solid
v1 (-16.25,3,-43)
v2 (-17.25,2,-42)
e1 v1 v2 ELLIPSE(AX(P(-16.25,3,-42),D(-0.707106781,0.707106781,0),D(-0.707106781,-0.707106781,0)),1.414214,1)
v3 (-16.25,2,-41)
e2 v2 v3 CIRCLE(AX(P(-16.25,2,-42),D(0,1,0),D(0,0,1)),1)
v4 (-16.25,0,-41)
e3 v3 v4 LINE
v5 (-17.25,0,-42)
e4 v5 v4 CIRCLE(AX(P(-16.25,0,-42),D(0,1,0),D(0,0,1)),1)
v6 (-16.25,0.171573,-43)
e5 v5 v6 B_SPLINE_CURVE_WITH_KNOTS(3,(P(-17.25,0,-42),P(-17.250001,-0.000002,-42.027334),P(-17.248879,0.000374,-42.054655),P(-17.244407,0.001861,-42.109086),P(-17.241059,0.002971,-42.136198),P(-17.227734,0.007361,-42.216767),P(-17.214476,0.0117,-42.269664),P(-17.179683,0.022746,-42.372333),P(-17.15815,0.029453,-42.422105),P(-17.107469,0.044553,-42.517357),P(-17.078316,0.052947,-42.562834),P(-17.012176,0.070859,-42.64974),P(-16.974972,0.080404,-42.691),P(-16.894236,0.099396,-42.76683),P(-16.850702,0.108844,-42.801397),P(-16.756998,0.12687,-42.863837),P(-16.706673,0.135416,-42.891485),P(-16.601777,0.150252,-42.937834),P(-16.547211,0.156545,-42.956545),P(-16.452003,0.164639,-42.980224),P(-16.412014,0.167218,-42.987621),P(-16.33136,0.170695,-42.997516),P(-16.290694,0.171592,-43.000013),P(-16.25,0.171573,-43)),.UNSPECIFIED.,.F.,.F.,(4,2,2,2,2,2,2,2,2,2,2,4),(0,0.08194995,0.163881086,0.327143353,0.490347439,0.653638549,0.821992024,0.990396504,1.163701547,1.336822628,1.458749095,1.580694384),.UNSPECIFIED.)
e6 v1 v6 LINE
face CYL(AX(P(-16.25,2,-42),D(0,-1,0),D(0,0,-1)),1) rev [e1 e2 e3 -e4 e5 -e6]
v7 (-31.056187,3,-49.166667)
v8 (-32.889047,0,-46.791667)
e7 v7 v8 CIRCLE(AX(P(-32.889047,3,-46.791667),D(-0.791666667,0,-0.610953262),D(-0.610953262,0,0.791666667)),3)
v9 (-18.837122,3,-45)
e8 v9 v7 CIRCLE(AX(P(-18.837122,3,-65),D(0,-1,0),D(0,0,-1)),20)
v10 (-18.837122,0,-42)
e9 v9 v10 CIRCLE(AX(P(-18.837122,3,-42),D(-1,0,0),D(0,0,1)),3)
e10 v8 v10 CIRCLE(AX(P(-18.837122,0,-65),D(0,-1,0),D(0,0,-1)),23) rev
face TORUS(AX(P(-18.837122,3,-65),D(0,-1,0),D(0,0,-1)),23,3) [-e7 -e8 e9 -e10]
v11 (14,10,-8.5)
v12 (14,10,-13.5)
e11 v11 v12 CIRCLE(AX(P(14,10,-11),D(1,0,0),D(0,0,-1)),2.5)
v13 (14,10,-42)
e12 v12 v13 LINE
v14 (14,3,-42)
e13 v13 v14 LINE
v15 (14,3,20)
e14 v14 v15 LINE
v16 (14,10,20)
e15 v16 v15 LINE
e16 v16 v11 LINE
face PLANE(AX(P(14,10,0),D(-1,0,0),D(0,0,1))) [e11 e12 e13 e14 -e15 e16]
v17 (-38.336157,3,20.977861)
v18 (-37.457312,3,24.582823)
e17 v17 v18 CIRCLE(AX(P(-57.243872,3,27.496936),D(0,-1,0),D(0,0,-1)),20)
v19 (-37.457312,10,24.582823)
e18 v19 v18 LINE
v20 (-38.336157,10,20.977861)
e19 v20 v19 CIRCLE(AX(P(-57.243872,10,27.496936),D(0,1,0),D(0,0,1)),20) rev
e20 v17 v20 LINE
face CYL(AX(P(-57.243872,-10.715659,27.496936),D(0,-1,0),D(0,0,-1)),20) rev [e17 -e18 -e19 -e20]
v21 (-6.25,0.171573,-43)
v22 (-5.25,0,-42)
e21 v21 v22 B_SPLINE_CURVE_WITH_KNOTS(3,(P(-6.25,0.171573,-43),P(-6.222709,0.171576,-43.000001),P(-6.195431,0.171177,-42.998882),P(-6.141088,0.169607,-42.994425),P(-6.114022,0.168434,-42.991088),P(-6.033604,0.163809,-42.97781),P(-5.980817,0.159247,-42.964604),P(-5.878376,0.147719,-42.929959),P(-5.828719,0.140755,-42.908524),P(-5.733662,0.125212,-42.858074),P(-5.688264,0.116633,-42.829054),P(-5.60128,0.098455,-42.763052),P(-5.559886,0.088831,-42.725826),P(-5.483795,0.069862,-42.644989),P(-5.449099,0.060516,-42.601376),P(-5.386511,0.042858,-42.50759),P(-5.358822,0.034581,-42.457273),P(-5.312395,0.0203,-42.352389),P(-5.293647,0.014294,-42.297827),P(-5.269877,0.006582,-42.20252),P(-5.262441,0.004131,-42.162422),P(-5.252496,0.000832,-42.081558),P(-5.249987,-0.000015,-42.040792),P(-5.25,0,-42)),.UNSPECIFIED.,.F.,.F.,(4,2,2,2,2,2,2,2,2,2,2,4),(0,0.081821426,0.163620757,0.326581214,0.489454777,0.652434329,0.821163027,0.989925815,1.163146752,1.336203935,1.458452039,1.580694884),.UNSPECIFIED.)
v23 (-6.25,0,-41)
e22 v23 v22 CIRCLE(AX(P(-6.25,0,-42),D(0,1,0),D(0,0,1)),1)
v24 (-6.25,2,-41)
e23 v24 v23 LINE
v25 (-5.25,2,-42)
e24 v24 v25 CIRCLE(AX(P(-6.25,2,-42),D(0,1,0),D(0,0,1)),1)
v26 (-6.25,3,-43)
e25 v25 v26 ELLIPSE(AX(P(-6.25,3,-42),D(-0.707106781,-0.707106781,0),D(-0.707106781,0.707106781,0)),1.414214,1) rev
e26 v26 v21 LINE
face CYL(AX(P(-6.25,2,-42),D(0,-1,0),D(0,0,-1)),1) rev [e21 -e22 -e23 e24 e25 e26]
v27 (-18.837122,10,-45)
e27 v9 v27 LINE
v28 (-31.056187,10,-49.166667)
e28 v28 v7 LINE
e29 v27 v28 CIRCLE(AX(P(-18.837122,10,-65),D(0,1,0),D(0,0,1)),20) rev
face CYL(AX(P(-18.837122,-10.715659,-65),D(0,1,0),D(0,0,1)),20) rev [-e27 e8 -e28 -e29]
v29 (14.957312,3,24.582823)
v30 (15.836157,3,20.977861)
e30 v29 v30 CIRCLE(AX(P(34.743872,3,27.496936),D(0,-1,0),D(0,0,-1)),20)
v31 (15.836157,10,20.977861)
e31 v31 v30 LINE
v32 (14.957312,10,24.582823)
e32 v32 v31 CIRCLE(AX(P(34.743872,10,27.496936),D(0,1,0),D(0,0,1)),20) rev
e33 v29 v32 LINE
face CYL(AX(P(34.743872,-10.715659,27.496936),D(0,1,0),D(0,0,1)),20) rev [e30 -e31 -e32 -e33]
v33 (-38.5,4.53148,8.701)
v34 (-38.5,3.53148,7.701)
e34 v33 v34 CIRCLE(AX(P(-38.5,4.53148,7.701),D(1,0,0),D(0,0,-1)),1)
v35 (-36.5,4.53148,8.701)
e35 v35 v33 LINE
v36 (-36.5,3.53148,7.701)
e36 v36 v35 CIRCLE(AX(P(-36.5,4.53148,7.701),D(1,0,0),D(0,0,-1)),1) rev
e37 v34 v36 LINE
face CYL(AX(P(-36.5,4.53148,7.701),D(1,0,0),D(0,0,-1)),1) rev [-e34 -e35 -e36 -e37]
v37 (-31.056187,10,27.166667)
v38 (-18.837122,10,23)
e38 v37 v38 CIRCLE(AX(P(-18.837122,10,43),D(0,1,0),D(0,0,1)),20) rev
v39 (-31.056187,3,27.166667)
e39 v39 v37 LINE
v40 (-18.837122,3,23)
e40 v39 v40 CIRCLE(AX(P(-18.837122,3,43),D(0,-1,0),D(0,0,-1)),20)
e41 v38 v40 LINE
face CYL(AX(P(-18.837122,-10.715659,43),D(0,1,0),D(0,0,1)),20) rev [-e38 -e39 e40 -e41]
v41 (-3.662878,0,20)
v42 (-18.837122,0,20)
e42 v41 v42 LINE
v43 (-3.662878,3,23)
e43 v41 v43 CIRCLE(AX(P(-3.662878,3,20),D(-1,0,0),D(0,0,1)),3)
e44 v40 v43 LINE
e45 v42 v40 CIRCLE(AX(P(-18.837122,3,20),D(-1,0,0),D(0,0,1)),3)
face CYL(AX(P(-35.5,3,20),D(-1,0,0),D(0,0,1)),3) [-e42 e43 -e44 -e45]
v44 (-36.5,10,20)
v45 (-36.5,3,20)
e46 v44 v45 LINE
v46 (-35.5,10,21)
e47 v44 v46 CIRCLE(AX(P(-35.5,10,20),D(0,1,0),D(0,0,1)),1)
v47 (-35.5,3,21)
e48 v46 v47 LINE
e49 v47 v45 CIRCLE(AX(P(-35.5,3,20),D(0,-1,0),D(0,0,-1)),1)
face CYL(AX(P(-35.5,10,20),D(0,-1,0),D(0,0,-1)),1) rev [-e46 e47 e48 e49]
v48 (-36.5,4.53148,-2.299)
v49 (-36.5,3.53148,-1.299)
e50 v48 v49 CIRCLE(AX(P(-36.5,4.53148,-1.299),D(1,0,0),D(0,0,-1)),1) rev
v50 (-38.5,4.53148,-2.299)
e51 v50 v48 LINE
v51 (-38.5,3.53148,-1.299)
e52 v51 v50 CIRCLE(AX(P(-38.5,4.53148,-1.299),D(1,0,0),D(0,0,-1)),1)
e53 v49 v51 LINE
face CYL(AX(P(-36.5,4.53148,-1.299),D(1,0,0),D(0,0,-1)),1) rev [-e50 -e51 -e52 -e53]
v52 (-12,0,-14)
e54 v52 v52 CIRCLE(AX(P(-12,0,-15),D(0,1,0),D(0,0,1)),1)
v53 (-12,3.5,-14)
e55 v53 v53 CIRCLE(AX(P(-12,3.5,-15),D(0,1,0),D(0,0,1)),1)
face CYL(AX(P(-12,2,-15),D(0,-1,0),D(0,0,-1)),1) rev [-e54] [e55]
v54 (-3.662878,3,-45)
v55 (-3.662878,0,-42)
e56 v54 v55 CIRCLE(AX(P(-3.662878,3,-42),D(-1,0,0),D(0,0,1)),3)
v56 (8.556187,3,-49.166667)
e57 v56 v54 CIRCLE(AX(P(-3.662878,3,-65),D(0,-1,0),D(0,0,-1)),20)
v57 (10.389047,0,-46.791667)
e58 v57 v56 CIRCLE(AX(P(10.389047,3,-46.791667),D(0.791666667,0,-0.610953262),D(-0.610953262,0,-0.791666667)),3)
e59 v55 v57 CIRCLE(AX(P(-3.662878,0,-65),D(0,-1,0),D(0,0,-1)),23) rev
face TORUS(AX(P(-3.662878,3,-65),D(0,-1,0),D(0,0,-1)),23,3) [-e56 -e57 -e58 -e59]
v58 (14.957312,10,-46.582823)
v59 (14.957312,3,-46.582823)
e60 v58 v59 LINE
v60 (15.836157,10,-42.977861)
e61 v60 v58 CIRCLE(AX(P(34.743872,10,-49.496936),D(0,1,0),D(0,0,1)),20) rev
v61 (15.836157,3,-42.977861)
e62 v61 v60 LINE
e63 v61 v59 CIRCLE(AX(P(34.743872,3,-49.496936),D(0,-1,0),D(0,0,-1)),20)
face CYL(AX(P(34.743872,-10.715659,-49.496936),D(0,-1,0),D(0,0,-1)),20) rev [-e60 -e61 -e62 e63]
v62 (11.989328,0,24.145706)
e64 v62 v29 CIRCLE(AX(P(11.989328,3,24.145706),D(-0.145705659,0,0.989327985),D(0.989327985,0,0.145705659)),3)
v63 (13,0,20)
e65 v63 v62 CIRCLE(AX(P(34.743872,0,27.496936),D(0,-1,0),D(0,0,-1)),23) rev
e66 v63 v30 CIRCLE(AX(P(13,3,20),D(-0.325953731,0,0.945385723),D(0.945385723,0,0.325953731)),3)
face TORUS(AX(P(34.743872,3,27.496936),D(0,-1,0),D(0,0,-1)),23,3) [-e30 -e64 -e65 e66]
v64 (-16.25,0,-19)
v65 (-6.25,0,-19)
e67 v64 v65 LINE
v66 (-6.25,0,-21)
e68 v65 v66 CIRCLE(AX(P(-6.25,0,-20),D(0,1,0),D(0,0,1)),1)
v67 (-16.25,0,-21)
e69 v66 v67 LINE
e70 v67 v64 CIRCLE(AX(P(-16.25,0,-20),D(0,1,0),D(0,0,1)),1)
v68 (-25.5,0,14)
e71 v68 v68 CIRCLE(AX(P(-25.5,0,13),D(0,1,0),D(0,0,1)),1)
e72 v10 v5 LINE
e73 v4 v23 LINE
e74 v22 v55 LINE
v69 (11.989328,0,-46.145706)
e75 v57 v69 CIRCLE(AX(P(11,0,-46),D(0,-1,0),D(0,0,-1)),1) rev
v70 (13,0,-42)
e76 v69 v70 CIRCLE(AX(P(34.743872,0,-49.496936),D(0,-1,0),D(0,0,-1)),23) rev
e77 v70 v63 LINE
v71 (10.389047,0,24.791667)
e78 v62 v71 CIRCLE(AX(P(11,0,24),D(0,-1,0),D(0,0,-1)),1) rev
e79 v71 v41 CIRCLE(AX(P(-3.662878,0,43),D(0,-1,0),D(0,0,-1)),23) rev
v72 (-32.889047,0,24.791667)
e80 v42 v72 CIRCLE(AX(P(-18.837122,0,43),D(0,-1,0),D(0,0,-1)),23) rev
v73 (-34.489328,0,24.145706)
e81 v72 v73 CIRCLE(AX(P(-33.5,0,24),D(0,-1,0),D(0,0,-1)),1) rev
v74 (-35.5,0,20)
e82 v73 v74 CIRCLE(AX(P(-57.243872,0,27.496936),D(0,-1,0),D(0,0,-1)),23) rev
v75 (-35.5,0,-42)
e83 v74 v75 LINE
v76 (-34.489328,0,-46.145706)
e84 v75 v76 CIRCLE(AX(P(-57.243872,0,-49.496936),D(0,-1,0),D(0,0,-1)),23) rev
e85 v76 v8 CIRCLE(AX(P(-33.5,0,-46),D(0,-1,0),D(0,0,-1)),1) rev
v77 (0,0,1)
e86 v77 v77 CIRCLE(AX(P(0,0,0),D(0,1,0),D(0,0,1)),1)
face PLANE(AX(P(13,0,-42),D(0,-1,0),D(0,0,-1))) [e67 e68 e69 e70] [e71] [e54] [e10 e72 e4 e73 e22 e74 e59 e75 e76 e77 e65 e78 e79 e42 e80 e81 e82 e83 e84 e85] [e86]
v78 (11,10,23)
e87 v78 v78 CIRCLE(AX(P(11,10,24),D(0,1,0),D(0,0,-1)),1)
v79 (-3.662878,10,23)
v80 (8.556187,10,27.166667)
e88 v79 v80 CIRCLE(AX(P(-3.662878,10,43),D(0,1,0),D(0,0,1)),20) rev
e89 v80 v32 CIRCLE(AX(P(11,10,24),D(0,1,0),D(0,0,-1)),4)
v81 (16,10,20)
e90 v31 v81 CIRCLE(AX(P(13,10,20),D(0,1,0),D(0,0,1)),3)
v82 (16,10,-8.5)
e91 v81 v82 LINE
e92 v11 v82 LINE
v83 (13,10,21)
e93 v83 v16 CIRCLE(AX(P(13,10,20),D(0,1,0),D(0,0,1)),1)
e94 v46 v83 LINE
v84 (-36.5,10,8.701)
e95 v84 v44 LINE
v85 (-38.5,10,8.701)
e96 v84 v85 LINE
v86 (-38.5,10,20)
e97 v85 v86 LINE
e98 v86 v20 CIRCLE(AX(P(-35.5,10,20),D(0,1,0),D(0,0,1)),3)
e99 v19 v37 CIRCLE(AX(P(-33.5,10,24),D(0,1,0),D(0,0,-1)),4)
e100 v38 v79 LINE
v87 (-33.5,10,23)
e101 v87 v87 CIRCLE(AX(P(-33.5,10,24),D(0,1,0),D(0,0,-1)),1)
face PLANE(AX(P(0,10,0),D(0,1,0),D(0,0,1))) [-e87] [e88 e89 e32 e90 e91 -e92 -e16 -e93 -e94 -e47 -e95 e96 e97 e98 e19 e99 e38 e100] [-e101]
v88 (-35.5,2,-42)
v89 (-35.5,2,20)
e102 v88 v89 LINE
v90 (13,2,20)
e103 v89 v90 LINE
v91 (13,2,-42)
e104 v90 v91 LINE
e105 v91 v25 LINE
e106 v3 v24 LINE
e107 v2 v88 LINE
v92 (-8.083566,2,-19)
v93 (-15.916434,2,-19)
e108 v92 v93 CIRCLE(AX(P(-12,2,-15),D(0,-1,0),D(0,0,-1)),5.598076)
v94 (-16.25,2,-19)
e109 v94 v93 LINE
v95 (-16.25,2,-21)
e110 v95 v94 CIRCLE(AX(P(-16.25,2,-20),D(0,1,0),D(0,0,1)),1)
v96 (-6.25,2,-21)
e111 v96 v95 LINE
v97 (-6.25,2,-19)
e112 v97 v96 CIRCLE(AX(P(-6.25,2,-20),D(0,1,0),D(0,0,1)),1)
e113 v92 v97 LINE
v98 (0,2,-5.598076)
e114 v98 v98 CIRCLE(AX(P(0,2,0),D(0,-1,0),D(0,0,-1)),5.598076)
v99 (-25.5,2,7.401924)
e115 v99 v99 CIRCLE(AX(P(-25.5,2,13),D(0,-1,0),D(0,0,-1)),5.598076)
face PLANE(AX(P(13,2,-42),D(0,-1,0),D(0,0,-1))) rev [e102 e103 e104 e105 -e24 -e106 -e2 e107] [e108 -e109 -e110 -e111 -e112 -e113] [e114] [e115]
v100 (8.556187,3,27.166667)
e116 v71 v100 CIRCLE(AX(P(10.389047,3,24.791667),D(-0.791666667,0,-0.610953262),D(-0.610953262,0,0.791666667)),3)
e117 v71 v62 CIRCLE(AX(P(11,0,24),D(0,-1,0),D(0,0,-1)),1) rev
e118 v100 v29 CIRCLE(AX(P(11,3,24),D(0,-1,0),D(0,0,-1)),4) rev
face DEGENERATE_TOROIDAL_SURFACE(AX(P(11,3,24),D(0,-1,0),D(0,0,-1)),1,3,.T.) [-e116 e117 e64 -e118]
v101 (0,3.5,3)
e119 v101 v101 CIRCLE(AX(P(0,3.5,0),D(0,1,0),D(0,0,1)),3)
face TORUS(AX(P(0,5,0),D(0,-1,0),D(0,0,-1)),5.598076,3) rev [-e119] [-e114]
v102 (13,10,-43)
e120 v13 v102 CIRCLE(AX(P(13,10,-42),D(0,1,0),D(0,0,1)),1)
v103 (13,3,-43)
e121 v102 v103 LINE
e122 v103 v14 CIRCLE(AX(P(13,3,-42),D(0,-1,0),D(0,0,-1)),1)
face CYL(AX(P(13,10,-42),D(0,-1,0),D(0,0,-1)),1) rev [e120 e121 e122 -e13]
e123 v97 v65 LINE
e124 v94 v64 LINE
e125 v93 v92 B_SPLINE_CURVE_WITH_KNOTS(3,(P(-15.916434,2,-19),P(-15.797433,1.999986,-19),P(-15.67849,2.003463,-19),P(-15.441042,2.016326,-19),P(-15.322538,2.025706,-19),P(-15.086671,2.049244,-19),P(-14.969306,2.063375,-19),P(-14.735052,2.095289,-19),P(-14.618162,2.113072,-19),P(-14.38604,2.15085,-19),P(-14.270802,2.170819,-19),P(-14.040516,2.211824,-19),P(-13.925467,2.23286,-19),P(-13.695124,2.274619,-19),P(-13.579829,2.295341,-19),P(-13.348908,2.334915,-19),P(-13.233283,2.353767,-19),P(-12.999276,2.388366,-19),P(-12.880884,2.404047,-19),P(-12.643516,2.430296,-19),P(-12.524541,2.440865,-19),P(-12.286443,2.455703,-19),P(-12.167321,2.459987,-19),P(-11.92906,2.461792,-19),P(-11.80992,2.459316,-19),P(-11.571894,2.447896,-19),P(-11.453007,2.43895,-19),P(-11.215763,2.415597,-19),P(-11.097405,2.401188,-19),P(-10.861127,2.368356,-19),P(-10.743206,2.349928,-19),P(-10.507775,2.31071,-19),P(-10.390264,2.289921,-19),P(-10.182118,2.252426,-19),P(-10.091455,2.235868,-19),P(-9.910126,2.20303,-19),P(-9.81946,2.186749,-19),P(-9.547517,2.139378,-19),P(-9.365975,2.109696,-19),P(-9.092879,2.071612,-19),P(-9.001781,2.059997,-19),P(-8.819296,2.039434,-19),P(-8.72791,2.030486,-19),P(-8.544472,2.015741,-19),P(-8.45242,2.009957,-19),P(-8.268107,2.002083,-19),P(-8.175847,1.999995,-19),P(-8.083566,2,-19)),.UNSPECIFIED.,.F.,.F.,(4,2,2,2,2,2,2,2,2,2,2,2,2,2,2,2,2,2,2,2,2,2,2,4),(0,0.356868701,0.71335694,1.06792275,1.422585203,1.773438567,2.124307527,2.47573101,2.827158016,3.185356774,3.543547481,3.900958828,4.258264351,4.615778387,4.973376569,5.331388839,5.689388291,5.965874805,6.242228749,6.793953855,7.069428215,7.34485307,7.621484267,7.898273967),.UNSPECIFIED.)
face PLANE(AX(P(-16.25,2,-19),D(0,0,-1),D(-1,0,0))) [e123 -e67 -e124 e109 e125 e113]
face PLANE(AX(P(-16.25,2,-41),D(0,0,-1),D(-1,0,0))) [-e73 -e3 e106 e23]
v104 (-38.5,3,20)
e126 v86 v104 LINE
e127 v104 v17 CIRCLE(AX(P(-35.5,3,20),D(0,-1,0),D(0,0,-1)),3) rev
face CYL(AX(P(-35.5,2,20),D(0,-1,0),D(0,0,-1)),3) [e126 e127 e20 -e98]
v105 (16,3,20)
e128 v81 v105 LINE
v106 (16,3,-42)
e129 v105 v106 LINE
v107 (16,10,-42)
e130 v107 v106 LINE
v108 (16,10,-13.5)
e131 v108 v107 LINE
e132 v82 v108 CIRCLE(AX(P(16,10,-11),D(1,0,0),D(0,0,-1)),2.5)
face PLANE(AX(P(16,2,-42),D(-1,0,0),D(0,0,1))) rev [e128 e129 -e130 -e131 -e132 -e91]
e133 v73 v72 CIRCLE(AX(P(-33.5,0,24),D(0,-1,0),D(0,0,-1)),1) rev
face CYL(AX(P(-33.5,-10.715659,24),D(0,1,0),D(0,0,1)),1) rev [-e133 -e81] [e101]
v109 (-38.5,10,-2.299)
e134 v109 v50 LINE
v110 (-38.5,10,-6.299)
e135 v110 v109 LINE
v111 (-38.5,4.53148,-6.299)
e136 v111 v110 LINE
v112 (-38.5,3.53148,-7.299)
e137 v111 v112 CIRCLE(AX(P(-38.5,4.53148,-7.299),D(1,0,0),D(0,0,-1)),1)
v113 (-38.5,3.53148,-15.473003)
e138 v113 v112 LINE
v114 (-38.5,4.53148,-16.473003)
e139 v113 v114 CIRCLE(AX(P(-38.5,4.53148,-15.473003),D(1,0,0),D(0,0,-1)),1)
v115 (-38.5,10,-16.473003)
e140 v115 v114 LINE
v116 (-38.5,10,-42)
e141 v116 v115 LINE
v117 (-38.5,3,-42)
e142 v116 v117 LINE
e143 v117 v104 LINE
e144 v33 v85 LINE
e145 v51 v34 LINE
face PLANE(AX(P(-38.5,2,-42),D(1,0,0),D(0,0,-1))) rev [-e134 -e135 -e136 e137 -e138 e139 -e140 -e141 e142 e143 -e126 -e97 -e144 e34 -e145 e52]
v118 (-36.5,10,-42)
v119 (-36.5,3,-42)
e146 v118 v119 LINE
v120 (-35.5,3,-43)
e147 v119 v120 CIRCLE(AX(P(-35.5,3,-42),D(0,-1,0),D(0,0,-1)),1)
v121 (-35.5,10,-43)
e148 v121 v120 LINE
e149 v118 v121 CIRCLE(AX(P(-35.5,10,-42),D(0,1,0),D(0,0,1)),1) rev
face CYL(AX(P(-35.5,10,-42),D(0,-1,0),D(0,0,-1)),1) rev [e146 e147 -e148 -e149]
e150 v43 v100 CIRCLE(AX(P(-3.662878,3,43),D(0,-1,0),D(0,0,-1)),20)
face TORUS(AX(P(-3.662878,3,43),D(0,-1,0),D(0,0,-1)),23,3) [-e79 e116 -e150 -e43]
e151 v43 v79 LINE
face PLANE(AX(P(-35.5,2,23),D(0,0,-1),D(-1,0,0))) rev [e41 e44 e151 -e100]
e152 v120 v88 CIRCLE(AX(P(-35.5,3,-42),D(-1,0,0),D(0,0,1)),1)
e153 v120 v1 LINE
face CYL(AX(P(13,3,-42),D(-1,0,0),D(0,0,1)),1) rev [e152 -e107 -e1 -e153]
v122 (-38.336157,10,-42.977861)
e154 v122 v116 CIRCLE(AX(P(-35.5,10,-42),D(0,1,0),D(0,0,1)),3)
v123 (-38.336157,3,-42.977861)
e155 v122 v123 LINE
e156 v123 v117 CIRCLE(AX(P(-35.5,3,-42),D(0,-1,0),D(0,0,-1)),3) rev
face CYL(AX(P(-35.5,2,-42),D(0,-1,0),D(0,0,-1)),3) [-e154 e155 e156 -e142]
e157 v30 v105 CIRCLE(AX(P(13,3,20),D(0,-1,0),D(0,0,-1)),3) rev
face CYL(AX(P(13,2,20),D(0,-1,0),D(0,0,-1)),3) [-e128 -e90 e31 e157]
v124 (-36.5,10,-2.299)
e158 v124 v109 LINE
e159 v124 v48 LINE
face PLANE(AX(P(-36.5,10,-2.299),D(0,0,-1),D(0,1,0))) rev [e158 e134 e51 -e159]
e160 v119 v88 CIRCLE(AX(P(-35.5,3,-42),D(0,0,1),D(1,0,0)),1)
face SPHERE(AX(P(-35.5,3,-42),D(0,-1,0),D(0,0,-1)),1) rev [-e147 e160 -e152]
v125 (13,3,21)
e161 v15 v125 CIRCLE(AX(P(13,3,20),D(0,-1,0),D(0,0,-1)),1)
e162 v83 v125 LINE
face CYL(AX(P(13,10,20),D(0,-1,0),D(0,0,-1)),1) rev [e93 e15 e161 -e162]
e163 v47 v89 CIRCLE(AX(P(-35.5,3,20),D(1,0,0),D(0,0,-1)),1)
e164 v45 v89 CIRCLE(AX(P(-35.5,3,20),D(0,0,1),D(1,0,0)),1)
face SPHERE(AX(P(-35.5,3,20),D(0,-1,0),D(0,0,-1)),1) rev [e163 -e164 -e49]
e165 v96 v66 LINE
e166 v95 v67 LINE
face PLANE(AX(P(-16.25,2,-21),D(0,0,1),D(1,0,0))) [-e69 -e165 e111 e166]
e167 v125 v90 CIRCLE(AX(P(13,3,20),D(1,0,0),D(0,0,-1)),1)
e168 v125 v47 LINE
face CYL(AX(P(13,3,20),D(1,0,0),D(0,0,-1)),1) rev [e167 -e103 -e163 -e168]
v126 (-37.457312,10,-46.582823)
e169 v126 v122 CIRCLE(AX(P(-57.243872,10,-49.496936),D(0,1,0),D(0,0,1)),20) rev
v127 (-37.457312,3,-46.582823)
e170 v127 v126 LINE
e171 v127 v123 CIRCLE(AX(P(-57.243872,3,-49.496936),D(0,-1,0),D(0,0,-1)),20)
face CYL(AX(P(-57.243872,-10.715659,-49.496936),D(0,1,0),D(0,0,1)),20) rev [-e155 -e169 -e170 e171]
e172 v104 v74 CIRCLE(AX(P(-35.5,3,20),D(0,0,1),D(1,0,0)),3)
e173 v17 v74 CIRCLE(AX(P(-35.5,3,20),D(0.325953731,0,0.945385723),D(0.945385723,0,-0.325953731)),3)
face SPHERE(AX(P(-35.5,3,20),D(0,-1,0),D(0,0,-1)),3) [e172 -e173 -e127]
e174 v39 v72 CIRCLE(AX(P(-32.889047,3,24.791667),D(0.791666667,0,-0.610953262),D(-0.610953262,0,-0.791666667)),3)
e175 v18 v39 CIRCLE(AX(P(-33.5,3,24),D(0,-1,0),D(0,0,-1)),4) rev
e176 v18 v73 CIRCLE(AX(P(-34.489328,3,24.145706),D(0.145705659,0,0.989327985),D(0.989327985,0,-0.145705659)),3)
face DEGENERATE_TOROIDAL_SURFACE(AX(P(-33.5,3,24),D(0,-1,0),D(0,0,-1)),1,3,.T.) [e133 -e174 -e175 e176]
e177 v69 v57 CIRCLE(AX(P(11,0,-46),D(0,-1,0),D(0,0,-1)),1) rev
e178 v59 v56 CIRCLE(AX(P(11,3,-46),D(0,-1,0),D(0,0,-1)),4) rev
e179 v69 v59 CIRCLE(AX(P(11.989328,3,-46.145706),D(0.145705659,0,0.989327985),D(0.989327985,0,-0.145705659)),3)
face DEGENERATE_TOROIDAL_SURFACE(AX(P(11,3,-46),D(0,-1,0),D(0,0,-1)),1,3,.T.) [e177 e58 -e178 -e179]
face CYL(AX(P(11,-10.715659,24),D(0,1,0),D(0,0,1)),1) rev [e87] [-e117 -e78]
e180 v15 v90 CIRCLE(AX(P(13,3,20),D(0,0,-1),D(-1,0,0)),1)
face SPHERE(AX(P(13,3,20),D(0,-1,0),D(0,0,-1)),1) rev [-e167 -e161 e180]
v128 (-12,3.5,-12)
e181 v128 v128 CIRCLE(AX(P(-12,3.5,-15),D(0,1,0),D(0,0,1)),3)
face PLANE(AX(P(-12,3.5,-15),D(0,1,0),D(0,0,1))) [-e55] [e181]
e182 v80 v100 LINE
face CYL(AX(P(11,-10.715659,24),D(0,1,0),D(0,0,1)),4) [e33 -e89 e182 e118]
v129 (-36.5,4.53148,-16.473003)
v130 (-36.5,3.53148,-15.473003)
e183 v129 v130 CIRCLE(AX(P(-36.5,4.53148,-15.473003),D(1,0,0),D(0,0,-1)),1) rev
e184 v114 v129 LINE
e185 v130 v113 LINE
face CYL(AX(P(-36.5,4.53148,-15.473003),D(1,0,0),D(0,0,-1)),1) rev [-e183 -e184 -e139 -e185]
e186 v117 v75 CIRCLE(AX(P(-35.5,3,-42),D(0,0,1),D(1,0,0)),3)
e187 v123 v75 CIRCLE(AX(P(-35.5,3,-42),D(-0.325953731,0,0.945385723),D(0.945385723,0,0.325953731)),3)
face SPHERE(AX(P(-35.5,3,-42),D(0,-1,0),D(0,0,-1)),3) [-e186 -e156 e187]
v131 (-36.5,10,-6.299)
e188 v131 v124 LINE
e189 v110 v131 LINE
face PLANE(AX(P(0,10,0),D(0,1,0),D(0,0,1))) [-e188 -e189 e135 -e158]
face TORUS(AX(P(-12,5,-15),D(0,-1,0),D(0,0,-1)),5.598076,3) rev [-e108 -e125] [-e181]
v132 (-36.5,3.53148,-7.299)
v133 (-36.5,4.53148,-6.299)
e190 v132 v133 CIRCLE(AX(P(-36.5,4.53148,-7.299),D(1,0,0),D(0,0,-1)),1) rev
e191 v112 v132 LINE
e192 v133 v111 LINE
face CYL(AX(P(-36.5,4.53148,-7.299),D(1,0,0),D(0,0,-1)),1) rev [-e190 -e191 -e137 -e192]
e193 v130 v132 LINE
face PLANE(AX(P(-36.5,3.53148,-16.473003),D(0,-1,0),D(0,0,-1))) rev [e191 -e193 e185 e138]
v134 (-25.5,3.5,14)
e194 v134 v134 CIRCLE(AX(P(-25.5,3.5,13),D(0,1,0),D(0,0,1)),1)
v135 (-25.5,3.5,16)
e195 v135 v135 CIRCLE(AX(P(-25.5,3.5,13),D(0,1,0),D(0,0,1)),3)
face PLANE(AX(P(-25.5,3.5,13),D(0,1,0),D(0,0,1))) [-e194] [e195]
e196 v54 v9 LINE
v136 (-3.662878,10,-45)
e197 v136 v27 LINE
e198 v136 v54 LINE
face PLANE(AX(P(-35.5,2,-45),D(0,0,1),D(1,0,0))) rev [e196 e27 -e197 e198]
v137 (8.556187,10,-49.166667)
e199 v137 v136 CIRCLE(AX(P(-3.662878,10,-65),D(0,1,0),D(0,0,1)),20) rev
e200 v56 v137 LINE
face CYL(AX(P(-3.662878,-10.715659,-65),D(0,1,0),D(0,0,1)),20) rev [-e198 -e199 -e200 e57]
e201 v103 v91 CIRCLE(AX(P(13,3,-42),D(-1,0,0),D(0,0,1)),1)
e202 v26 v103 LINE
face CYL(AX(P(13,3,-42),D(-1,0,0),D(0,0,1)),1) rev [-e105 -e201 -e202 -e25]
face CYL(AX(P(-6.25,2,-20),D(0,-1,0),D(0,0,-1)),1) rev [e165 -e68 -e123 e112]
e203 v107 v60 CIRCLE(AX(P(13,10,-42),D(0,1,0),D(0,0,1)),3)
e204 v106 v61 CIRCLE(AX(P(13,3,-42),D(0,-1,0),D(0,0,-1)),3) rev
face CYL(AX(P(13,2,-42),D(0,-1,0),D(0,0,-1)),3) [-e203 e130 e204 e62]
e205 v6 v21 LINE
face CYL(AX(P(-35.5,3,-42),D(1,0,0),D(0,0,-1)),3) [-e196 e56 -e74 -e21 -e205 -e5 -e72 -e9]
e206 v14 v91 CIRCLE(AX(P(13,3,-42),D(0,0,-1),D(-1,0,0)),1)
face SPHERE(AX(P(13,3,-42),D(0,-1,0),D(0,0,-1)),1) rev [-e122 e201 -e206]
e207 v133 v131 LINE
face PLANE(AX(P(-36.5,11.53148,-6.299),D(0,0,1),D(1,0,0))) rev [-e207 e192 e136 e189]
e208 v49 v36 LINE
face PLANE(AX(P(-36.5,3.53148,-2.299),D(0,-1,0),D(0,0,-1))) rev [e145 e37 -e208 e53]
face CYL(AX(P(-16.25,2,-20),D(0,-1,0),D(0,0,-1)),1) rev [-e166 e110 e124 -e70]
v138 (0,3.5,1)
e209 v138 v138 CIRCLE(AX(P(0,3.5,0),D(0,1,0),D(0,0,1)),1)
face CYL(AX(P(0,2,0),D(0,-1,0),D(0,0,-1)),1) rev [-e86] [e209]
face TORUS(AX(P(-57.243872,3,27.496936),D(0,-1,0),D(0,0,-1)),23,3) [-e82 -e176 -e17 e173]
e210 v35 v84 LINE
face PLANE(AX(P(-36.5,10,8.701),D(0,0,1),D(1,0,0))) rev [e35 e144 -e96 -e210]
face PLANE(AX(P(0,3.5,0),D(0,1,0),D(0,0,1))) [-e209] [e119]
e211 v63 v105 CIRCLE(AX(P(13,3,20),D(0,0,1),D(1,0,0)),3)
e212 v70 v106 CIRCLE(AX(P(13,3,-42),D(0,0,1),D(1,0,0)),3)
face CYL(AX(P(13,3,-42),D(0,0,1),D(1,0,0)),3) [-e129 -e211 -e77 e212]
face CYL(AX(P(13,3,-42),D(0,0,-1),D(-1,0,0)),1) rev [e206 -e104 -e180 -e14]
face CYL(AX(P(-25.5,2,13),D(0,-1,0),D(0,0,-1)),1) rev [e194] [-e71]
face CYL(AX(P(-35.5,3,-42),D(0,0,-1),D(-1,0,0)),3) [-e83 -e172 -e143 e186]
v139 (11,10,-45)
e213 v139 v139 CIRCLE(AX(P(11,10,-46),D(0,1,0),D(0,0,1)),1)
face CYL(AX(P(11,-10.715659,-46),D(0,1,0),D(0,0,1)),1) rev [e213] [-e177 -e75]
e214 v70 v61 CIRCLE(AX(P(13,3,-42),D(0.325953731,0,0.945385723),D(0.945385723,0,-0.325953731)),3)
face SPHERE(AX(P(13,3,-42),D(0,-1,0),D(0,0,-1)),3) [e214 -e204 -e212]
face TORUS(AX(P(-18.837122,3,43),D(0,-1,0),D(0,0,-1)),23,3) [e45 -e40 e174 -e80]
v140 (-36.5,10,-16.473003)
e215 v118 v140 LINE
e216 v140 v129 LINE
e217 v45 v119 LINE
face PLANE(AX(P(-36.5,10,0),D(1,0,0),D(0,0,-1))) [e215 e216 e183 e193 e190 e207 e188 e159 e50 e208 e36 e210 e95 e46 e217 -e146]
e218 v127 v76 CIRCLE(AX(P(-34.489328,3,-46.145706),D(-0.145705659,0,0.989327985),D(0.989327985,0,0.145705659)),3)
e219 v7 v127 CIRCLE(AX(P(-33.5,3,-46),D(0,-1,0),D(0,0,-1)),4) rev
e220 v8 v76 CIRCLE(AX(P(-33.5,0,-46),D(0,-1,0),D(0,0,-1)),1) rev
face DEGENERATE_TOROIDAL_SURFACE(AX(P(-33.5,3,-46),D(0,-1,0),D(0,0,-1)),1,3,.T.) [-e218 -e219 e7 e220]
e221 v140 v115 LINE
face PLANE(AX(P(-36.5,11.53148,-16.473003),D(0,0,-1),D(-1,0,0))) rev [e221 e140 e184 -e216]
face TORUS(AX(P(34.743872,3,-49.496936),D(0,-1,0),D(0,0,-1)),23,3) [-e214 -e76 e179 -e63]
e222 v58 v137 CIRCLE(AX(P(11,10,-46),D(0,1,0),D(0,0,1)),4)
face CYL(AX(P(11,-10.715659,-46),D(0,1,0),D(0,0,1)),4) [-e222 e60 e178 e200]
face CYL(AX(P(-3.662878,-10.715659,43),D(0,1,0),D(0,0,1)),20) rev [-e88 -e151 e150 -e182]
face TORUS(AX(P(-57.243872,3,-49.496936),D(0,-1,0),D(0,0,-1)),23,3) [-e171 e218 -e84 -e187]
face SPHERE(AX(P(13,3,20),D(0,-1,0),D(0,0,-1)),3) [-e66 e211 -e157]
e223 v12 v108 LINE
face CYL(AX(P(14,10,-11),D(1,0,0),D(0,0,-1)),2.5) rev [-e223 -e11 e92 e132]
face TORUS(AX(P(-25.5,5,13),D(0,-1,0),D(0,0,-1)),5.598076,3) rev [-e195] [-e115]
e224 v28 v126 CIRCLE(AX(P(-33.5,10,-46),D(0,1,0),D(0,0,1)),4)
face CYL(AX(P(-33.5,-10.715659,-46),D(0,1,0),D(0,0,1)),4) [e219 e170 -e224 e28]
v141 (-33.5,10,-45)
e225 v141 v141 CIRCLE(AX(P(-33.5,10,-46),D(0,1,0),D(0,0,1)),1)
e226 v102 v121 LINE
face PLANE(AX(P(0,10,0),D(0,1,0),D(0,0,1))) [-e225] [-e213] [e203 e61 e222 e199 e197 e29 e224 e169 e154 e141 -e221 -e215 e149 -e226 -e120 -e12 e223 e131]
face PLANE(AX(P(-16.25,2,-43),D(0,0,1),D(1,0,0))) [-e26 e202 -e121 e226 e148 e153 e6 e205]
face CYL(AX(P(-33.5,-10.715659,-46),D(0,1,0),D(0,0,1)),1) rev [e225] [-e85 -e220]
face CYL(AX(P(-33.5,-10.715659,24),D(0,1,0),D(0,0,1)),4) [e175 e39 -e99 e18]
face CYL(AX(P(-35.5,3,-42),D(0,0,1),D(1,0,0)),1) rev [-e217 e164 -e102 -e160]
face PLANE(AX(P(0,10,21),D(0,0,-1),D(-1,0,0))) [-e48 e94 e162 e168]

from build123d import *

# Parameters (mm, degrees)
SKETCH1_R           = 1.0000000000000018
SKETCH1_R_2         = 1
CASING_BOTTOM_DEPTH = 2
CASING_WALLS_DEPTH  = 8
FILLET1_R           = 1
BOSS_EXTRUDE3_START = -10
SKETCH3_R           = 0.9999999999999983
SKETCH3_R_2         = 1.0000000000000018
BOSS_EXTRUDE3_DEPTH = 10
FILLET2_R           = 20
FILLET3_R           = 3
SKETCH5_R           = 3.0000000000000027
SKETCH5_R_2         = 1.0000000000000018
SKETCH5_R_3         = 3
SKETCH5_R_4         = 1
BOSS_EXTRUDE4_DEPTH = 1.5
FILLET4_R           = 3
SKETCH6_W           = 10.174002270500015
SKETCH6_H           = 8
CUT_EXTRUDE2_DEPTH  = 2
FILLET5_R           = 1
CUT_EXTRUDE3_DEPTH  = 2


with BuildPart() as part:
    # Sketch1 → Casing bottom (new body)
    with BuildSketch(Plane(origin=(0, 0, 0), x_dir=(1, 0, 0), z_dir=(0, 1, 0))):
        with BuildLine():
            Line((-35.500000000000014, 45.000000000000014), (13.00000000000001, 45.000000000000014))
            ThreePointArc((13.00000000000001, 45.000000000000014), (15.121320343559663, 44.12132034355965), (16.000000000000014, 42))
            Line((16.000000000000014, 42), (16.000000000000007, -19.999999999999996))
            ThreePointArc((16.000000000000007, -19.999999999999996), (15.121320343559653, -22.121320343559645), (13.000000000000005, -23.000000000000004))
            Line((13.000000000000005, -23.000000000000004), (-35.50000000000001, -23.000000000000004))
            ThreePointArc((-35.50000000000001, -23.000000000000004), (-37.62132034355965, -22.12132034355964), (-38.50000000000001, -19.999999999999996))
            Line((-38.50000000000001, -19.999999999999996), (-38.500000000000014, 42))
            ThreePointArc((-38.500000000000014, 42), (-37.62132034355967, 44.12132034355965), (-35.500000000000014, 45.000000000000014))
        make_face()
        with Locations(Location((-25.500000000000004, -13.000000000000002, 0), (0, 0, 270))):
            Circle(SKETCH1_R, mode=Mode.SUBTRACT)
        with Locations(Location((0, 0, 0), (0, 0, 270))):
            Circle(SKETCH1_R_2, mode=Mode.SUBTRACT)
        with Locations(Location((-12, 15, 0), (0, 0, 270))):
            Circle(SKETCH1_R, mode=Mode.SUBTRACT)
        with BuildLine():
            Line((-16.249999999999996, 21.000000000000007), (-6.249999999999996, 21.000000000000007))
            ThreePointArc((-6.249999999999996, 21.000000000000007), (-5.249999999999996, 20.000000000000007), (-6.249999999999996, 19.000000000000007))
            Line((-6.249999999999996, 19.000000000000007), (-16.249999999999996, 19.000000000000007))
            ThreePointArc((-16.249999999999996, 19.000000000000007), (-17.249999999999996, 20.000000000000007), (-16.249999999999996, 21.000000000000007))
        make_face(mode=Mode.SUBTRACT)
        with BuildLine():
            Line((-16.249999999999996, 43.00000000000001), (-6.249999999999996, 43.00000000000001))
            ThreePointArc((-6.249999999999996, 43.00000000000001), (-5.249999999999996, 42.00000000000001), (-6.249999999999996, 41.00000000000001))
            Line((-6.249999999999996, 41.00000000000001), (-16.249999999999996, 41.00000000000001))
            ThreePointArc((-16.249999999999996, 41.00000000000001), (-17.249999999999996, 42.00000000000001), (-16.249999999999996, 43.00000000000001))
        make_face(mode=Mode.SUBTRACT)
    extrude(amount=CASING_BOTTOM_DEPTH)

    # Sketch2 → Casing walls (add)
    with BuildSketch(Plane(origin=(0, 2, 0), x_dir=(1, 0, 0), z_dir=(0, 1, 0))):
        with BuildLine():
            Line((16.000000000000007, -19.999999999999996), (16.000000000000014, 42))
            ThreePointArc((16.000000000000014, 42), (15.121320343559656, 44.121320343559645), (13.00000000000001, 45.000000000000014))
            Line((13.00000000000001, 45.000000000000014), (-35.500000000000014, 45.000000000000014))
            ThreePointArc((-35.500000000000014, 45.000000000000014), (-37.62132034355967, 44.12132034355965), (-38.50000000000002, 42))
            Line((-38.50000000000002, 42), (-38.50000000000001, -19.999999999999996))
            ThreePointArc((-38.50000000000001, -19.999999999999996), (-37.62132034355965, -22.12132034355964), (-35.50000000000001, -23))
            Line((-35.50000000000001, -23), (13.000000000000005, -23.000000000000004))
            ThreePointArc((13.000000000000005, -23.000000000000004), (15.121320343559653, -22.121320343559645), (16.000000000000007, -19.999999999999996))
        make_face()
        with BuildLine():
            ThreePointArc((-36.5, -19.999999999999996), (-36.20710678118655, -20.70710678118654), (-35.50000000000001, -20.999999999999996))
            Line((-35.50000000000001, -20.999999999999996), (13.000000000000009, -20.999999999999996))
            ThreePointArc((13.000000000000009, -20.999999999999996), (13.707106781186557, -20.707106781186543), (14.000000000000007, -19.999999999999996))
            Line((14.000000000000007, -19.999999999999996), (14.000000000000007, 42.00000000000001))
            ThreePointArc((14.000000000000007, 42.00000000000001), (13.707106781186555, 42.70710678118655), (13.000000000000009, 43.00000000000001))
            Line((13.000000000000009, 43.00000000000001), (-35.500000000000014, 43))
            ThreePointArc((-35.500000000000014, 43), (-36.20710678118657, 42.70710678118655), (-36.50000000000002, 42))
            Line((-36.50000000000002, 42), (-36.5, -19.999999999999996))
        make_face(mode=Mode.SUBTRACT)
    extrude(amount=CASING_WALLS_DEPTH)

    # Fillet1
    fillet1_edges = [part.edges().sort_by_distance(p)[0] for p in [
        (-25.875000000000007, 2, -43),
        (-36.20710678118657, 2, -42.70710678118655),
        (-36.20710678118655, 2, 20.707106781186543),
        (-11.25, 2, 20.999999999999996),
        (13.707106781186557, 2, 20.707106781186543),
        (14.000000000000007, 2, -11.000000000000004),
        (13.707106781186555, 2, -42.70710678118655),
        (3.375000000000007, 2, -43.00000000000001),
        (-36.500000000000014, 2, -11),
    ]]
    fillet(fillet1_edges, radius=FILLET1_R)

    # Sketch3 → Boss-Extrude3 (add)
    # profile 1 of 4: a face of its own
    with BuildSketch(Plane(origin=(0, 10, 0), x_dir=(1, 0, 0), z_dir=(0, 1, 0)).offset(BOSS_EXTRUDE3_START)):
        with BuildLine():
            Line((-35.500000000000014, 43), (-30.854248688935428, 43.00000000000001))
            ThreePointArc((-30.854248688935428, 43.00000000000001), (-33.600556679704695, 49.998735844509724), (-35.99161984870957, 42.87080992435478))
            ThreePointArc((-35.99161984870957, 42.87080992435478), (-35.75415553864241, 42.96716335857879), (-35.500000000000014, 43))
        make_face()
        with Locations(Location((-33.500000000000014, 46.000000000000014, 0), (0, 0, 270))):
            Circle(SKETCH3_R, mode=Mode.SUBTRACT)
    # profile 2 of 4: a face of its own
    with BuildSketch(Plane(origin=(0, 10, 0), x_dir=(1, 0, 0), z_dir=(0, 1, 0)).offset(BOSS_EXTRUDE3_START)):
        with BuildLine():
            Line((8.35424868893541, 43.00000000000001), (13.000000000000009, 43.00000000000001))
            ThreePointArc((13.000000000000009, 43.00000000000001), (13.25415553864241, 42.96716335857878), (13.491619848709576, 42.87080992435478))
            ThreePointArc((13.491619848709576, 42.87080992435478), (11.100556679704688, 49.998735844509724), (8.35424868893541, 43.00000000000001))
        make_face()
        with Locations(Location((11.000000000000007, 46.00000000000001, 0), (0, 0, 270))):
            Circle(SKETCH3_R_2, mode=Mode.SUBTRACT)
    # profile 3 of 4: a face of its own
    with BuildSketch(Plane(origin=(0, 10, 0), x_dir=(1, 0, 0), z_dir=(0, 1, 0)).offset(BOSS_EXTRUDE3_START)):
        with BuildLine():
            Line((8.35424868893541, -21.000000000000004), (13.000000000000009, -21.000000000000004))
            ThreePointArc((13.000000000000009, -21.000000000000004), (13.254155538642408, -20.967163358578787), (13.491619848709576, -20.870809924354788))
            ThreePointArc((13.491619848709576, -20.870809924354788), (11.100556679704685, -27.998735844509707), (8.35424868893541, -21.000000000000004))
        make_face()
        with Locations(Location((11.000000000000007, -24, 0), (0, 0, 90))):
            Circle(SKETCH3_R_2, mode=Mode.SUBTRACT)
    # profile 4 of 4: a face of its own
    with BuildSketch(Plane(origin=(0, 10, 0), x_dir=(1, 0, 0), z_dir=(0, 1, 0)).offset(BOSS_EXTRUDE3_START)):
        with BuildLine():
            Line((-35.500000000000014, -20.999999999999996), (-30.854248688935428, -21.000000000000004))
            ThreePointArc((-30.854248688935428, -21.000000000000004), (-33.600556679704695, -27.998735844509717), (-35.99161984870957, -20.870809924354788))
            ThreePointArc((-35.99161984870957, -20.870809924354788), (-35.75415553864241, -20.96716335857878), (-35.500000000000014, -20.999999999999996))
        make_face()
        with Locations(Location((-33.500000000000014, -24.000000000000007, 0), (0, 0, 90))):
            Circle(SKETCH3_R, mode=Mode.SUBTRACT)
    extrude(amount=BOSS_EXTRUDE3_DEPTH)

    # Fillet2
    fillet2_edges = [part.edges().sort_by_distance(p)[0] for p in [
        (-29.627016653792595, 5, -45.000000000000014),
        (-37.19733891886112, 5, -44.47366945943057),
        (14.69733891886112, 5, -44.47366945943056),
        (7.127016653792585, 5, -45.000000000000014),
        (7.127016653792586, 5, 23.000000000000004),
        (14.697338918861105, 5, 22.473669459430557),
        (-37.19733891886111, 5, 22.47366945943055),
        (-29.6270166537926, 5, 23.000000000000004),
    ]]
    fillet(fillet2_edges, radius=FILLET2_R)

    # Fillet3
    # the kernel refuses this fillet: 3 mm, written as the material it takes off along each edge
    with BuildSketch(Plane(origin=(-18.83712170138482, 0, 43), x_dir=(-0.6109532624423001, 0, -0.791666666666666), z_dir=(-0.791666666666666, 0, 0.6109532624423001))) as fillet3_piece_1:
        with BuildLine():
            CenterArc((20.000000000000004 + FILLET3_R, -FILLET3_R), FILLET3_R, 90, 90)
            Line((20.000000000000007, -FILLET3_R), (20.000000000000004, 0))
            Line((20.000000000000004, 0), (20.000000000000004 + FILLET3_R, 0))
        make_face()
    revolve(axis=Axis((-18.83712170138482, 0, 43), (0, -1, 0)), revolution_arc=37.658462006207905, mode=Mode.SUBTRACT)
    with BuildSketch(Plane(origin=(-33.500000000000014, 0, 24.00000000000001), x_dir=(0.6109532624422995, 0, 0.7916666666666664), z_dir=(0.7916666666666664, 0, -0.6109532624422995))) as fillet3_piece_2:
        with BuildLine():
            CenterArc((3.9999999999999982 - FILLET3_R, -FILLET3_R), FILLET3_R, 8.48e-15, 90)
            Line((3.9999999999999982, -FILLET3_R), (3.9999999999999982, 0))
            Line((3.9999999999999982, 0), (3.9999999999999982 - FILLET3_R, 0))
        make_face()
    revolve(axis=Axis((-33.500000000000014, 0, 24.00000000000001), (0, -1, 0)), revolution_arc=119.28031754414539, mode=Mode.SUBTRACT)
    with BuildSketch(Plane(origin=(-57.24387307605734, 0, 27.496936167148185), x_dir=(0.9453857252310887, 0, -0.32595372452127086), z_dir=(-0.32595372452127086, 0, -0.9453857252310887))) as fillet3_piece_3:
        with BuildLine():
            CenterArc((20.00000148352137 + FILLET3_R * 1.00000000214, -FILLET3_R), FILLET3_R, 90, 89.99999999999997)
            Line((20.00000148352137 + FILLET3_R * 2.14146922417e-09, -FILLET3_R), (20.00000148352137, 0))
            Line((20.00000148352137, 0), (20.00000148352137 + FILLET3_R * 1.00000000214, 0))
        make_face()
    revolve(axis=Axis((-57.24387307605734, 0, 27.496936167148185), (0, -1, 0)), revolution_arc=10.645221250007552, mode=Mode.SUBTRACT)
    with BuildSketch(Plane(origin=(-35.5, 0, 19.999999999999993), x_dir=(-0.9453857229785418, 0, 0.32595373105448533), z_dir=(0.32595373105448533, 0, 0.9453857229785418))) as fillet3_piece_4:
        with BuildLine():
            CenterArc((3.0000000000000036 - FILLET3_R, -FILLET3_R), FILLET3_R, 8.48e-15, 90)
            Line((3.0000000000000036, -FILLET3_R), (3.0000000000000036, 0))
            Line((3.0000000000000036, 0), (3.0000000000000036 - FILLET3_R, 0))
        make_face()
    revolve(axis=Axis((-35.5, 0, 19.999999999999993), (0, -1, 0)), revolution_arc=19.023366503969896, mode=Mode.SUBTRACT)
    with BuildSketch(Plane(origin=(-38.50000000000001, 0, 19.999999999999996), x_dir=(1, 0, -1.1e-16), z_dir=(-1.1e-16, 0, -1))) as fillet3_piece_5:
        with BuildLine():
            CenterArc((FILLET3_R, -FILLET3_R), FILLET3_R, 90, 90)
            Line((0, -FILLET3_R), (0, 0))
            Line((0, 0), (FILLET3_R, 0))
        make_face()
    extrude(amount=62, mode=Mode.SUBTRACT)
    with BuildSketch(Plane(origin=(-35.50000000000003, 0, -42.00000000000003), x_dir=(-1, 0, 9.47e-15), z_dir=(9.47e-15, 0, 1))) as fillet3_piece_6:
        with BuildLine():
            CenterArc((2.999999999999986 - FILLET3_R, -FILLET3_R), FILLET3_R, 8.48e-15, 90)
            Line((2.999999999999986, -FILLET3_R), (2.999999999999986, 0))
            Line((2.999999999999986, 0), (2.999999999999986 - FILLET3_R, 0))
        make_face()
    revolve(axis=Axis((-35.50000000000003, 0, -42.00000000000003), (0, -1, 0)), revolution_arc=19.023366503970635, mode=Mode.SUBTRACT)
    with BuildSketch(Plane(origin=(-57.243873076059, 0, -49.49693616714876), x_dir=(0.9893279835141823, 0, 0.14570566576410793), z_dir=(0.14570566576410793, 0, -0.9893279835141823))) as fillet3_piece_7:
        with BuildLine():
            CenterArc((20.000001483523118 + FILLET3_R * 1.00000000214, -FILLET3_R), FILLET3_R, 90, 90)
            Line((20.000001483523118 + FILLET3_R * 2.14147277688e-09, -FILLET3_R), (20.000001483523118, 0))
            Line((20.000001483523118, 0), (20.000001483523118 + FILLET3_R * 1.00000000214, 0))
        make_face()
    revolve(axis=Axis((-57.243873076059, 0, -49.49693616714876), (0, -1, 0)), revolution_arc=10.645221250006543, mode=Mode.SUBTRACT)
    with BuildSketch(Plane(origin=(-33.500000000000014, 0, -46.00000000000001), x_dir=(0.6109532624422982, 0, -0.7916666666666675), z_dir=(0.7916666666666675, 0, 0.6109532624422982))) as fillet3_piece_8:
        with BuildLine():
            CenterArc((4 - FILLET3_R, FILLET3_R), FILLET3_R, 270, 89.99999999999999)
            Line((4, FILLET3_R), (4, 0))
            Line((4, 0), (4 - FILLET3_R, 0))
        make_face()
    revolve(axis=Axis((-33.500000000000014, 0, -46.00000000000001), (0, 1, 0)), revolution_arc=119.28031754414503, mode=Mode.SUBTRACT)
    with BuildSketch(Plane(origin=(-18.837121701384845, 0, -65.00000000000001), x_dir=(1.8e-16, 0, 1), z_dir=(1, 0, -1.8e-16))) as fillet3_piece_9:
        with BuildLine():
            CenterArc((19.999999999999993 + FILLET3_R, -FILLET3_R), FILLET3_R, 90, 90)
            Line((20, -FILLET3_R), (19.999999999999993, 0))
            Line((19.999999999999993, 0), (19.999999999999993 + FILLET3_R, 0))
        make_face()
    revolve(axis=Axis((-18.837121701384845, 0, -65.00000000000001), (0, -1, 0)), revolution_arc=37.658462006207806, mode=Mode.SUBTRACT)
    with BuildSketch(Plane(origin=(-18.837121701384845, 0, -45.000000000000014), x_dir=(0, 0, 1), z_dir=(1, 0, 0))) as fillet3_piece_10:
        with BuildLine():
            CenterArc((FILLET3_R, -FILLET3_R), FILLET3_R, 90, 90)
            Line((0, -FILLET3_R), (0, 0))
            Line((0, 0), (FILLET3_R, 0))
        make_face()
    extrude(amount=15.174243402769676, mode=Mode.SUBTRACT)
    with BuildSketch(Plane(origin=(-3.662878298615171, 0, -65.00000000000001), x_dir=(0.610953262442299, 0, 0.7916666666666667), z_dir=(0.7916666666666667, 0, -0.610953262442299))) as fillet3_piece_11:
        with BuildLine():
            CenterArc((19.999999999999996 + FILLET3_R, -FILLET3_R), FILLET3_R, 90, 90)
            Line((20.00000000000001, -FILLET3_R), (19.999999999999996, 0))
            Line((19.999999999999996, 0), (19.999999999999996 + FILLET3_R, 0))
        make_face()
    revolve(axis=Axis((-3.662878298615171, 0, -65.00000000000001), (0, -1, 0)), revolution_arc=37.65846200620783, mode=Mode.SUBTRACT)
    with BuildSketch(Plane(origin=(11.00000000000001, 0, -46.00000000000001), x_dir=(0.9893279845211018, 0, -0.14570565892721785), z_dir=(0.14570565892721785, 0, 0.9893279845211018))) as fillet3_piece_12:
        with BuildLine():
            CenterArc((4.000000000000008 - FILLET3_R, FILLET3_R), FILLET3_R, 270, 89.99999999999999)
            Line((4.0000000000000036, FILLET3_R), (4.000000000000008, 0))
            Line((4.000000000000008, 0), (4.000000000000008 - FILLET3_R, 0))
        make_face()
    revolve(axis=Axis((11.00000000000001, 0, -46.00000000000001), (0, 1, 0)), revolution_arc=119.28031754414513, mode=Mode.SUBTRACT)
    with BuildSketch(Plane(origin=(34.74387307606069, 0, -49.49693616714912), x_dir=(-0.9453857252310925, 0, 0.32595372452125976), z_dir=(0.32595372452125976, 0, 0.9453857252310925))) as fillet3_piece_13:
        with BuildLine():
            CenterArc((20.000001483524827 + FILLET3_R * 1.00000000214, -FILLET3_R), FILLET3_R, 90, 90)
            Line((20.000001483524827 + FILLET3_R * 2.14147277688e-09, -FILLET3_R), (20.000001483524827, 0))
            Line((20.000001483524827, 0), (20.000001483524827 + FILLET3_R * 1.00000000214, 0))
        make_face()
    revolve(axis=Axis((34.74387307606069, 0, -49.49693616714912), (0, -1, 0)), revolution_arc=10.645221250005626, mode=Mode.SUBTRACT)
    with BuildSketch(Plane(origin=(13.000000000000021, 0, -42.00000000000002), x_dir=(0.9453857229785415, 0, -0.32595373105448605), z_dir=(-0.32595373105448605, 0, -0.9453857229785415))) as fillet3_piece_14:
        with BuildLine():
            CenterArc((2.9999999999999925 - FILLET3_R, -FILLET3_R), FILLET3_R, 8.48e-15, 90)
            Line((2.9999999999999925, -FILLET3_R), (2.9999999999999925, 0))
            Line((2.9999999999999925, 0), (2.9999999999999925 - FILLET3_R, 0))
        make_face()
    revolve(axis=Axis((13.000000000000021, 0, -42.00000000000002), (0, -1, 0)), revolution_arc=19.023366503970404, mode=Mode.SUBTRACT)
    with BuildSketch(Plane(origin=(16.000000000000014, 0, -42), x_dir=(-1, 0, -1.1e-16), z_dir=(-1.1e-16, 0, 1))) as fillet3_piece_15:
        with BuildLine():
            CenterArc((FILLET3_R, -FILLET3_R), FILLET3_R, 90, 90)
            Line((0, -FILLET3_R), (0, 0))
            Line((0, 0), (FILLET3_R, 0))
        make_face()
    extrude(amount=62, mode=Mode.SUBTRACT)
    with BuildSketch(Plane(origin=(13.000000000000014, 0, 20.000000000000007), x_dir=(1, 0, -3.55e-15), z_dir=(-3.55e-15, 0, -1))) as fillet3_piece_16:
        with BuildLine():
            CenterArc((2.9999999999999964 - FILLET3_R, -FILLET3_R), FILLET3_R, 8.48e-15, 90)
            Line((2.9999999999999964, -FILLET3_R), (2.9999999999999964, 0))
            Line((2.9999999999999964, 0), (2.9999999999999964 - FILLET3_R, 0))
        make_face()
    revolve(axis=Axis((13.000000000000014, 0, 20.000000000000007), (0, -1, 0)), revolution_arc=19.023366503970454, mode=Mode.SUBTRACT)
    with BuildSketch(Plane(origin=(34.74387307605885, 0, 27.496936167148768), x_dir=(-0.989327983514182, 0, -0.14570566576410904), z_dir=(-0.14570566576410904, 0, 0.989327983514182))) as fillet3_piece_17:
        with BuildLine():
            CenterArc((20.000001483522976 + FILLET3_R * 1.00000000214, -FILLET3_R), FILLET3_R, 90, 90)
            Line((20.000001483522976 + FILLET3_R * 2.14147040841e-09, -FILLET3_R), (20.000001483522976, 0))
            Line((20.000001483522976, 0), (20.000001483522976 + FILLET3_R * 1.00000000214, 0))
        make_face()
    revolve(axis=Axis((34.74387307605885, 0, 27.496936167148768), (0, -1, 0)), revolution_arc=10.645221250006648, mode=Mode.SUBTRACT)
    with BuildSketch(Plane(origin=(11.000000000000002, 0, 24), x_dir=(0.9893279845211012, 0, 0.14570565892722168), z_dir=(0.14570565892722168, 0, -0.9893279845211012))) as fillet3_piece_18:
        with BuildLine():
            CenterArc((3.999999999999997 - FILLET3_R, -FILLET3_R), FILLET3_R, 8.48e-15, 90)
            Line((3.9999999999999987, -FILLET3_R), (3.999999999999997, 0))
            Line((3.999999999999997, 0), (3.999999999999997 - FILLET3_R, 0))
        make_face()
    revolve(axis=Axis((11.000000000000002, 0, 24), (0, -1, 0)), revolution_arc=119.280317544145, mode=Mode.SUBTRACT)
    with BuildSketch(Plane(origin=(-3.662878298615178, 0, 43), x_dir=(0, 0, -1), z_dir=(-1, 0, 0))) as fillet3_piece_19:
        with BuildLine():
            CenterArc((20 + FILLET3_R, -FILLET3_R), FILLET3_R, 90, 90)
            Line((20, -FILLET3_R), (20, 0))
            Line((20, 0), (20 + FILLET3_R, 0))
        make_face()
    revolve(axis=Axis((-3.662878298615178, 0, 43), (0, -1, 0)), revolution_arc=37.65846200620784, mode=Mode.SUBTRACT)
    with BuildSketch(Plane(origin=(-3.662878298615178, 0, 23.000000000000004), x_dir=(0, 0, -1), z_dir=(-1, 0, 0))) as fillet3_piece_20:
        with BuildLine():
            CenterArc((FILLET3_R, -FILLET3_R), FILLET3_R, 90, 90)
            Line((0, -FILLET3_R), (0, 0))
            Line((0, 0), (FILLET3_R, 0))
        make_face()
    extrude(amount=15.174243402769639, mode=Mode.SUBTRACT)

    # Sketch5 → Boss-Extrude4 (add)
    # profile 1 of 3: a face of its own
    with BuildSketch(Plane(origin=(0, 2, 0), x_dir=(1, 0, 0), z_dir=(0, 1, 0))):
        with Locations(Location((-25.500000000000004, -13.000000000000002, 0), (0, 0, 90))):
            Circle(SKETCH5_R)
        with Locations(Location((-25.500000000000004, -13.000000000000002, 0), (0, 0, 270))):
            Circle(SKETCH5_R_2, mode=Mode.SUBTRACT)
    # profile 2 of 3: a face of its own
    with BuildSketch(Plane(origin=(0, 2, 0), x_dir=(1, 0, 0), z_dir=(0, 1, 0))):
        with Locations(Location((0, 0, 0), (0, 0, 90))):
            Circle(SKETCH5_R_3)
        with Locations(Location((0, 0, 0), (0, 0, 270))):
            Circle(SKETCH5_R_4, mode=Mode.SUBTRACT)
    # profile 3 of 3: a face of its own
    with BuildSketch(Plane(origin=(0, 2, 0), x_dir=(1, 0, 0), z_dir=(0, 1, 0))):
        with Locations(Location((-12, 15, 0), (0, 0, 90))):
            Circle(SKETCH5_R)
        with Locations(Location((-12, 15, 0), (0, 0, 270))):
            Circle(SKETCH5_R_2, mode=Mode.SUBTRACT)
    extrude(amount=BOSS_EXTRUDE4_DEPTH)

    # Fillet4
    # the kernel refuses this fillet: 3 mm, written as the material it adds along each edge
    with BuildSketch(Plane(origin=(-25.500000000000004, 2, 13.000000000000002), x_dir=(0, 0, -1), z_dir=(1, 0, 0))) as fillet4_piece_1:
        with BuildLine():
            CenterArc((5.5980762113534634, 3), FILLET4_R, 209.9999999999986, 60.000000000001364)
            Line((3.000000000000112, 1.500000000000063), (2.9480384757730445, 1.4700000000000641))
            ThreePointArc((2.9480384757730445, 1.4700000000000641), (2.9400000000000013, 0.7500000000000315), (2.9400000000000013, 0))
            Line((2.9400000000000013, 0), (3.0000000000000018, -0.06000000000000005))
            Line((3.0000000000000018, -0.06000000000000005), (5.5980762113534634, -0.06000000000000005))
            Line((5.5980762113534634, -0.06000000000000005), (5.5980762113534634, 0))
        make_face()
    revolve(axis=Axis((-25.500000000000004, 2, 13.000000000000002), (0, 1, 0)))
    with BuildSketch(Plane(origin=(0, 2, 0), x_dir=(6e-17, 0, -1), z_dir=(1, 0, 6e-17))) as fillet4_piece_2:
        with BuildLine():
            CenterArc((5.598076211353462, 3), FILLET4_R, 209.99999999999858, 60.00000000000142)
            Line((3.0000000000001092, 1.500000000000063), (2.9480384757730422, 1.4700000000000641))
            ThreePointArc((2.9480384757730422, 1.4700000000000641), (2.94, 0.7500000000000315), (2.94, 0))
            Line((2.94, 0), (3, -0.06000000000000005))
            Line((3, -0.06000000000000005), (5.598076211353462, -0.06000000000000005))
            Line((5.598076211353462, -0.06000000000000005), (5.598076211353462, 0))
        make_face()
    revolve(axis=Axis((0, 2, 0), (0, 1, 0)))
    with BuildSketch(Plane(origin=(-12, 2, -15), x_dir=(0, 0, -1), z_dir=(1, 0, 0))) as fillet4_piece_3_section:
        with BuildLine():
            CenterArc((5.598076211353469, 3), FILLET4_R, 209.99999999999855, 60.00000000000148)
            Line((3.0000000000001137, 1.5000000000000648), (2.9480384757730462, 1.470000000000066))
            ThreePointArc((2.9480384757730462, 1.470000000000066), (2.940000000000005, 0.7500000000000324), (2.940000000000005, 0))
            Line((2.940000000000005, 0), (3.0000000000000036, -0.06000000000000005))
            Line((3.0000000000000036, -0.06000000000000005), (5.598076211353469, -0.06000000000000005))
            Line((5.598076211353469, -0.06000000000000005), (5.598076211353469, 0))
        make_face()
    fillet4_piece_3 = revolve(axis=Axis((-12, 2, -15), (0, 1, 0)), mode=Mode.PRIVATE)
    fillet4_piece_3 = split(fillet4_piece_3, bisect_by=Plane(origin=(-12, 2, -19.000000000000007), z_dir=(0, 0, 1)), keep=Keep.TOP, mode=Mode.PRIVATE)
    add(fillet4_piece_3)

    # Sketch6 → Cut-Extrude2 (cut)
    with BuildSketch(Plane.ZY.offset(38.50000000000001)):
        with Locations((-11.386001467976088, 7.53148)):
            Rectangle(SKETCH6_W, SKETCH6_H)
        Polygon((-2.2990003327260853, 10), (8.700999667273914, 10), (8.700999667273914, 3.53148), (-2.2990003327260817, 3.53148), align=None)
    extrude(amount=-CUT_EXTRUDE2_DEPTH, mode=Mode.SUBTRACT)

    # Fillet5
    fillet5_edges = [part.edges().sort_by_distance(p)[0] for p in [
        (-37.50000000000001, 3.53148, -16.473002603226092),
        (-37.50000000000001, 3.53148, -6.299000332726077),
        (-37.50000000000001, 3.53148, -2.2990003327260773),
        (-37.50000000000001, 3.53148, 8.700999667273917),
    ]]
    fillet(fillet5_edges, radius=FILLET5_R)

    # Sketch7 → Cut-Extrude3 (cut)
    with BuildSketch(Plane(origin=(16.00000000000001, 0, 1.79e-15), x_dir=(1.1e-16, 0, -1), z_dir=(1, 0, 1.1e-16))):
        with BuildLine():
            Line((8.500000000000004, 10), (13.500000000000005, 10))
            ThreePointArc((13.500000000000005, 10), (11.000000000000007, 7.4999999999999964), (8.500000000000004, 10))
        make_face()
    extrude(amount=-CUT_EXTRUDE3_DEPTH, mode=Mode.SUBTRACT)


solid = part.part
